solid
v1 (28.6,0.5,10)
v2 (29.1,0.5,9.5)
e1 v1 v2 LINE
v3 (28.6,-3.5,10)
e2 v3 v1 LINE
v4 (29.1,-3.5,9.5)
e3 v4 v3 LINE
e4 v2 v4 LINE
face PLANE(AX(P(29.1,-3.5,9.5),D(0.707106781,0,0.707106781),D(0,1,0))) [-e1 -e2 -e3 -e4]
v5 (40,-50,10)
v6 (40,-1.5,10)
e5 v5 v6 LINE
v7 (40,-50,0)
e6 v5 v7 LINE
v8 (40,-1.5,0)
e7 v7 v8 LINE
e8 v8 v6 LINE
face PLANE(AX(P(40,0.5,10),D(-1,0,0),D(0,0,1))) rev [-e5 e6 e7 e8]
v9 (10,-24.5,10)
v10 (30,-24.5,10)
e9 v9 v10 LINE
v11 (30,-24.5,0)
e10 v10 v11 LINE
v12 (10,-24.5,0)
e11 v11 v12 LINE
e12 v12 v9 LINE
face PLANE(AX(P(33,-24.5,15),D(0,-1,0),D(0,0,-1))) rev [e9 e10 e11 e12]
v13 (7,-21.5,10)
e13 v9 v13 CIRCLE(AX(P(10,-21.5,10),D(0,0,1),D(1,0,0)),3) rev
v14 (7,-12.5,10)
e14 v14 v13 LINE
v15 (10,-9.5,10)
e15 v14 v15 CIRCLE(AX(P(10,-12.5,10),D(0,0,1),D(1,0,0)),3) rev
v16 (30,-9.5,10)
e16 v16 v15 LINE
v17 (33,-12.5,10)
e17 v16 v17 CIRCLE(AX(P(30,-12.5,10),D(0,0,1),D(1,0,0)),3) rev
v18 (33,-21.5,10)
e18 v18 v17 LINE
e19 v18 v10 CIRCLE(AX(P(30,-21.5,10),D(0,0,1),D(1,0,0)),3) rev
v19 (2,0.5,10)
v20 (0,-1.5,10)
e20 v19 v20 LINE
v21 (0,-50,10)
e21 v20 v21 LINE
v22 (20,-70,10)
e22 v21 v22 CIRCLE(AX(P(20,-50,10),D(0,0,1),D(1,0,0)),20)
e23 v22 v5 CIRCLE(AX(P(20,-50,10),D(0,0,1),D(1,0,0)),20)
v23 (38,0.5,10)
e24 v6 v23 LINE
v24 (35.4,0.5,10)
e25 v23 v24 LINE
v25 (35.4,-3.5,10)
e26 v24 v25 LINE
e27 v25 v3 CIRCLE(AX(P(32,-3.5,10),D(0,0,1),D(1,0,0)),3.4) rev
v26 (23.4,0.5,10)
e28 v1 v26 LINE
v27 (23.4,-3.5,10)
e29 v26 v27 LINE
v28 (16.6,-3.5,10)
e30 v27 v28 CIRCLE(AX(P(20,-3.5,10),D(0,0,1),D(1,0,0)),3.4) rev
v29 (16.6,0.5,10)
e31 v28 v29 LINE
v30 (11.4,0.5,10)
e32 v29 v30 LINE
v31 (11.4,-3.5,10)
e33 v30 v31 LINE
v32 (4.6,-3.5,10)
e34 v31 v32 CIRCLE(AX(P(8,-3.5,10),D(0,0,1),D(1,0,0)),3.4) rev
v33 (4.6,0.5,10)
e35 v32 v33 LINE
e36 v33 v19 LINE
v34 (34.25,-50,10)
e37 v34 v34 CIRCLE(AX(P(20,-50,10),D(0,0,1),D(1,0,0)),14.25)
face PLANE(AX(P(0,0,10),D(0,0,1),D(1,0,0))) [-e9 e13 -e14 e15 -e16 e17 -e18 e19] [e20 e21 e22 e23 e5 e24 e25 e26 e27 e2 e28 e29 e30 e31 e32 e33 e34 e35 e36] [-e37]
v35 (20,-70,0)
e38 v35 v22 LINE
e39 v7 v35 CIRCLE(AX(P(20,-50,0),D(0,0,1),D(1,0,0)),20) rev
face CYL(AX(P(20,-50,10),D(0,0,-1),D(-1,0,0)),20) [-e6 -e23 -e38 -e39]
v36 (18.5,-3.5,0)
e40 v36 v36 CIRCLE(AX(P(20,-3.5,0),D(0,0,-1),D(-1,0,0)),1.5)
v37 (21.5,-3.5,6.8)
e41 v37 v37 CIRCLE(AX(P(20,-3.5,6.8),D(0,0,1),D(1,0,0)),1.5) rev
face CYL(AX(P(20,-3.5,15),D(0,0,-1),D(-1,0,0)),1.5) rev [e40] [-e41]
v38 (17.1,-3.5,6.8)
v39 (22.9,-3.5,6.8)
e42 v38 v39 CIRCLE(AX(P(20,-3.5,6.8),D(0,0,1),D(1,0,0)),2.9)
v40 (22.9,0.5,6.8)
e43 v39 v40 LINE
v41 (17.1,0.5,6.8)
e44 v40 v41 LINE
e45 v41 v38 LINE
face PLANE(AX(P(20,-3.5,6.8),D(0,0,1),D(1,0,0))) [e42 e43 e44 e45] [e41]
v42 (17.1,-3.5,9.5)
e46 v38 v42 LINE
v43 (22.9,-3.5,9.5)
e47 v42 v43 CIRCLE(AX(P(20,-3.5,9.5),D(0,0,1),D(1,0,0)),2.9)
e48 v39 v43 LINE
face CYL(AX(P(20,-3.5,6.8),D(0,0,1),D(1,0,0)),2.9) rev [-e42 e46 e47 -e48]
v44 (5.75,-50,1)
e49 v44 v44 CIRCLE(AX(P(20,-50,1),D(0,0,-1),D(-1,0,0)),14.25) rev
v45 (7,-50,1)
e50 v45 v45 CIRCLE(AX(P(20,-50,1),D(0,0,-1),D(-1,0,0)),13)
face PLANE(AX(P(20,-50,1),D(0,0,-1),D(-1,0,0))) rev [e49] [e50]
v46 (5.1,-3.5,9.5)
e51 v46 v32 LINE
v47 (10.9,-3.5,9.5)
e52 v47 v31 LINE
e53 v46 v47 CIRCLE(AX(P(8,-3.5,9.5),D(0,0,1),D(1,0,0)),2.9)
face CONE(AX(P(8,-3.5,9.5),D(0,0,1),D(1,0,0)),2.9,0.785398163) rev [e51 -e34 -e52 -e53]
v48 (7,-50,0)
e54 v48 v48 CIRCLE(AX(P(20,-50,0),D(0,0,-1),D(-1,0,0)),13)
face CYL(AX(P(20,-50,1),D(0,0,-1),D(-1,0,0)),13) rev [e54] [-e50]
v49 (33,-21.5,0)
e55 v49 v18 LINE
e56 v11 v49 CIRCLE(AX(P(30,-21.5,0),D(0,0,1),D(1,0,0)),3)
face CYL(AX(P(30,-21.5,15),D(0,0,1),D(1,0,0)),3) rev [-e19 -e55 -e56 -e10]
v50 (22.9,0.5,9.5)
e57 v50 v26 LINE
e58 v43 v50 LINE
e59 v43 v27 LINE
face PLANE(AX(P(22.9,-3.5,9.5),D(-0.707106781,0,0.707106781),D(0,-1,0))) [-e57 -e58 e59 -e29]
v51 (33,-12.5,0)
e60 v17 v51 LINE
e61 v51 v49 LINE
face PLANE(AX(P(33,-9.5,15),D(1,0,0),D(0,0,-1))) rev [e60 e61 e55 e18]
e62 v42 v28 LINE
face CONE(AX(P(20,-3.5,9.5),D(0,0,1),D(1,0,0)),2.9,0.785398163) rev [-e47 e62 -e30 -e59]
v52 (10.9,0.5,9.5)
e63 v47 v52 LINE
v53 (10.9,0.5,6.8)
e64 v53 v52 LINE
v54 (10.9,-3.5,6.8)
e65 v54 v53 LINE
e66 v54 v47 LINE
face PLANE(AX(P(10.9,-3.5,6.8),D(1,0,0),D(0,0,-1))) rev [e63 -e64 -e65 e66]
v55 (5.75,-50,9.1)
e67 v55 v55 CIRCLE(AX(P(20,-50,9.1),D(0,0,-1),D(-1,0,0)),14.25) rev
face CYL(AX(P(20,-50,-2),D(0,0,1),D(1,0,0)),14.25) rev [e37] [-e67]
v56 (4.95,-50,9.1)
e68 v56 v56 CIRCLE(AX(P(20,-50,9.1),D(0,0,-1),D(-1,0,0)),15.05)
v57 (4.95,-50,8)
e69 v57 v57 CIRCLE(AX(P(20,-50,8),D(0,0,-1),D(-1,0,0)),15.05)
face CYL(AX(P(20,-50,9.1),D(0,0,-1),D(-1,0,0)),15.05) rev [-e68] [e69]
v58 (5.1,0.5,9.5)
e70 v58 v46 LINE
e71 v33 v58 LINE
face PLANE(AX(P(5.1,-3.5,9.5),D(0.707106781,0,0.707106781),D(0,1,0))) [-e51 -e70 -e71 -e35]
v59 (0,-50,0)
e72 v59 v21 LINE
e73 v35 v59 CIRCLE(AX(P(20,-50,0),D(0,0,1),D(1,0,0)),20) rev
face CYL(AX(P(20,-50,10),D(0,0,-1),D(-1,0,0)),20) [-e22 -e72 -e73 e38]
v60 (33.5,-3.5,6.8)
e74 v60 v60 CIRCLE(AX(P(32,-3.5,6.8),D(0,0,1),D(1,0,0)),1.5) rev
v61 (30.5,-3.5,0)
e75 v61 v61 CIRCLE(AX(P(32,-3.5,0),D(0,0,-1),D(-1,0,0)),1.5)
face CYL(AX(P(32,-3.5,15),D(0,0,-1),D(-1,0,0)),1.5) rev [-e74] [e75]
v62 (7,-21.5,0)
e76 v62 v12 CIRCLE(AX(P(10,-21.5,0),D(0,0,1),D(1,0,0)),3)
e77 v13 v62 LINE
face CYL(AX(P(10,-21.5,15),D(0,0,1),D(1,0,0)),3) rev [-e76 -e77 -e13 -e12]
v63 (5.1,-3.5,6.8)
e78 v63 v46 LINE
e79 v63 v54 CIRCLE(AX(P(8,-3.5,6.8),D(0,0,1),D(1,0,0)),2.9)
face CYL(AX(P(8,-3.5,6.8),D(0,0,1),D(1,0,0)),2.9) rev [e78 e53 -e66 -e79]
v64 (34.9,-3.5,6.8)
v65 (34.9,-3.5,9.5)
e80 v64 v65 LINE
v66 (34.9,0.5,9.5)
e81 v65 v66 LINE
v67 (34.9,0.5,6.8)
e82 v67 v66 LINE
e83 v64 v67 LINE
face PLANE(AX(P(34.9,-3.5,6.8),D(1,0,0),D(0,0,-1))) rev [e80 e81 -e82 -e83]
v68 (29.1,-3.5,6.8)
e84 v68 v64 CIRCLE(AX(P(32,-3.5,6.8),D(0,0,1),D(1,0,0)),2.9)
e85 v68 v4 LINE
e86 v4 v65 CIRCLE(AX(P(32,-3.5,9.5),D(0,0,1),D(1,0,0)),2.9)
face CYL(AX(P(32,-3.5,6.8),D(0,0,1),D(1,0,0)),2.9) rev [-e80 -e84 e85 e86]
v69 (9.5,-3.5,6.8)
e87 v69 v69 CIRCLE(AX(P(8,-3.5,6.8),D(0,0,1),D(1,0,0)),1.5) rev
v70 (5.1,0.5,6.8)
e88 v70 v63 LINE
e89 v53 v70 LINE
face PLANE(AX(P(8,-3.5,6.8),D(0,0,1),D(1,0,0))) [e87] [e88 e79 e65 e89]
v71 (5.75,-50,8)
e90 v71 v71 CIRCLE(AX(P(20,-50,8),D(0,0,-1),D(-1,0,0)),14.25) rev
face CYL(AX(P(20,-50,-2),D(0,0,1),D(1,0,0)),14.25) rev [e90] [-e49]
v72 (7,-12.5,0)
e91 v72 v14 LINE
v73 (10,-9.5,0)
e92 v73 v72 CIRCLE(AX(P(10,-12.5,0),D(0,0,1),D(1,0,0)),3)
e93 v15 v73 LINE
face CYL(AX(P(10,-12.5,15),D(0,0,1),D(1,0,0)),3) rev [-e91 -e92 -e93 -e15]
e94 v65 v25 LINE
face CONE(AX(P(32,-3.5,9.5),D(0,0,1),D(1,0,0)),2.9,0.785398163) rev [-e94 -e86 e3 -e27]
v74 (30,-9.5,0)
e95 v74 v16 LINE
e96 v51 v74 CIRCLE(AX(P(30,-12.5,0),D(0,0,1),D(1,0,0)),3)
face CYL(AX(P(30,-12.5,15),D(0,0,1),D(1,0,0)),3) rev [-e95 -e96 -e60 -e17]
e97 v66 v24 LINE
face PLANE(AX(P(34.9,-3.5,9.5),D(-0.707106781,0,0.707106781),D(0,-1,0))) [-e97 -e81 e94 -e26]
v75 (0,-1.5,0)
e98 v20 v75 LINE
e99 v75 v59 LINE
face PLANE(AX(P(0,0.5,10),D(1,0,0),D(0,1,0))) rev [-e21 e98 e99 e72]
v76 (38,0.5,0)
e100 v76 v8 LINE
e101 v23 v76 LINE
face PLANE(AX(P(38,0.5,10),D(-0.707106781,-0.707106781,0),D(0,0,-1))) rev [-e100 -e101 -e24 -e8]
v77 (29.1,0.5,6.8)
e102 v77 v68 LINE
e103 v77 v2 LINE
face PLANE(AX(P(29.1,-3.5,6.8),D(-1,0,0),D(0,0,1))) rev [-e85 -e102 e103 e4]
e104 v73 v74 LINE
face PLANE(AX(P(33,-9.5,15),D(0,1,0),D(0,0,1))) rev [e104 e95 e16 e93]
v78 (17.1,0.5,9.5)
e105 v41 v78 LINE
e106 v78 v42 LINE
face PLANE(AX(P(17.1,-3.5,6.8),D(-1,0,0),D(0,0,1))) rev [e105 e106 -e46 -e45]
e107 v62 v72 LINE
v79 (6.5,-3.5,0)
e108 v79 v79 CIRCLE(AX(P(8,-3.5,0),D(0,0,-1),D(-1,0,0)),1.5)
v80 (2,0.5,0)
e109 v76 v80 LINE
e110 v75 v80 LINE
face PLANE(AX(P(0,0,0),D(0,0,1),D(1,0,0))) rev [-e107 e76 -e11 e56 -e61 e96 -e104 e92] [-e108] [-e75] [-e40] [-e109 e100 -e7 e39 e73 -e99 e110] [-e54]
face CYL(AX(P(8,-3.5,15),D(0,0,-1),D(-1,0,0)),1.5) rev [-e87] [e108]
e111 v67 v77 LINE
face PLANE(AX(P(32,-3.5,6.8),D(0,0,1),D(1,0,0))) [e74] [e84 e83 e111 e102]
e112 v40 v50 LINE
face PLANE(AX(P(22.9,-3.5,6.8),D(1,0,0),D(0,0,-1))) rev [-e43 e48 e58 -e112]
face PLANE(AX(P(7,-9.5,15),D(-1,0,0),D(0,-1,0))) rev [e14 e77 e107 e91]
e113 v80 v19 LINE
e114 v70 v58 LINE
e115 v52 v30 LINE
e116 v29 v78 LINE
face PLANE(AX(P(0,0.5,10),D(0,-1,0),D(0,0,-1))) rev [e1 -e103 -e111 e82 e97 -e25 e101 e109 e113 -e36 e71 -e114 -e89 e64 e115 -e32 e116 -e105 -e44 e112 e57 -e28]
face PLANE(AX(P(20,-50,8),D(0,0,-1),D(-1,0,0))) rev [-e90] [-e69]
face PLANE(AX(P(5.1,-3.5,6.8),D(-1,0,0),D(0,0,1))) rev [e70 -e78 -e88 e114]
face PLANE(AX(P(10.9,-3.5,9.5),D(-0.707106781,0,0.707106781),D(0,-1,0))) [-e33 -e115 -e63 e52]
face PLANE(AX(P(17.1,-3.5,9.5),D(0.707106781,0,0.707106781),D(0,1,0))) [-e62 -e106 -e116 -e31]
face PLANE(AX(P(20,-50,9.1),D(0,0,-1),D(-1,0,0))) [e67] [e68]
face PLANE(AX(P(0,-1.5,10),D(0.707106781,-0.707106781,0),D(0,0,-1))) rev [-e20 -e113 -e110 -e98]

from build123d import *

# Parameters (mm, degrees)
SKETCH_1_W          = 40
SKETCH_1_H          = 70.5
EXTRUDE_1_DEPTH     = 10
SKETCH_2_R          = 14.25
CUT_EXTRUDE_1_DEPTH = 12
SKETCH_3_R          = 15.05
CUT_EXTRUDE_2_DEPTH = 1.1
CHAMFER_1_SIZE      = 2
FILLET_1_R          = 20
SKETCH_4_R          = 1.5
CUT_EXTRUDE_3_DEPTH = 15
SKETCH_5_W          = 26
SKETCH_5_H          = 15
CUT_EXTRUDE_4_DEPTH = 15
FILLET_2_R          = 3
EXTRUDE_START       = -1
SKETCH_7_R          = 14.25
SKETCH_7_R_2        = 13
EXTRUDE_2_DEPTH     = 1
CUT_EXTRUDE_5_DEPTH = 3.2
CHAMFER_2_SIZE      = 0.5


with BuildPart() as part:
    # 草图1 → 凸台-拉伸1 (new body)
    with BuildSketch(Plane.XY):
        with Locations((20, -34.75)):
            Rectangle(SKETCH_1_W, SKETCH_1_H)
    extrude(amount=EXTRUDE_1_DEPTH)

    # 草图2 → 切除-拉伸1 (cut)
    with BuildSketch(Plane.XY.offset(10)):
        with Locations((20, -50)):
            Circle(SKETCH_2_R)
    extrude(amount=-CUT_EXTRUDE_1_DEPTH, mode=Mode.SUBTRACT)

    # 草图3 → 切除-拉伸2 (cut)
    with BuildSketch(Plane(origin=(0, 0, 8), x_dir=(-1, 0, 0), z_dir=(0, 0, -1))):
        with Locations((-20, -50)):
            Circle(SKETCH_3_R)
    extrude(amount=-CUT_EXTRUDE_2_DEPTH, mode=Mode.SUBTRACT)

    # 倒角1
    chamfer_1_edges = [part.edges().sort_by_distance(p)[0] for p in [
        (0, 0.5, 5),
        (40, 0.5, 5),
    ]]
    chamfer(chamfer_1_edges, length=CHAMFER_1_SIZE)

    # 圆角1
    fillet_1_edges = [part.edges().sort_by_distance(p)[0] for p in [
        (0, -70, 5),
        (40, -70, 5),
    ]]
    fillet(fillet_1_edges, radius=FILLET_1_R - 0.0001)  # a hair under: the kernel refuses the full size

    # 草图4 → 切除-拉伸3 (cut)
    with BuildSketch(Plane(origin=(0, 0, 0), x_dir=(-1, 0, 0), z_dir=(0, 0, -1))):
        with Locations((-32, -3.5)):
            Circle(SKETCH_4_R)
        with Locations((-20, -3.5)):
            Circle(SKETCH_4_R)
        with Locations((-8, -3.5)):
            Circle(SKETCH_4_R)
    extrude(amount=-CUT_EXTRUDE_3_DEPTH, mode=Mode.SUBTRACT)

    # 草图5 → 切除-拉伸4 (cut)
    with BuildSketch(Plane(origin=(0, 0, 0), x_dir=(-1, 0, 0), z_dir=(0, 0, -1))):
        with Locations((-20, -17)):
            Rectangle(SKETCH_5_W, SKETCH_5_H)
    extrude(amount=-CUT_EXTRUDE_4_DEPTH, mode=Mode.SUBTRACT)

    # 圆角2
    fillet_2_edges = [part.edges().sort_by_distance(p)[0] for p in [
        (7, -9.5, 5),
        (7, -24.5, 5),
        (33, -24.5, 5),
        (33, -9.5, 5),
    ]]
    fillet(fillet_2_edges, radius=FILLET_2_R)

    # 草图7 → 凸台-拉伸2 (add)
    with BuildSketch(Plane(origin=(0, 0, 0), x_dir=(-1, 0, 0), z_dir=(0, 0, -1)).offset(EXTRUDE_START)):
        with Locations((-20, -50)):
            Circle(SKETCH_7_R)
        with Locations((-20, -50)):
            Circle(SKETCH_7_R_2, mode=Mode.SUBTRACT)
    extrude(amount=EXTRUDE_2_DEPTH)

    # 草图8 → 切除-拉伸5 (cut)
    with BuildSketch(Plane.XY.offset(10)):
        with BuildLine():
            Line((5.1, -3.5), (5.1, 0.5))
            Line((5.1, 0.5), (10.9, 0.5))
            Line((10.9, 0.5), (10.9, -3.5))
            ThreePointArc((10.9, -3.5), (8, -6.4), (5.1, -3.5))
        make_face()
        with BuildLine():
            Line((17.1, -3.5), (17.1, 0.5))
            Line((17.1, 0.5), (22.9, 0.5))
            Line((22.9, 0.5), (22.9, -3.5))
            ThreePointArc((22.9, -3.5), (20, -6.4), (17.1, -3.5))
        make_face()
        with BuildLine():
            Line((34.9, -3.5), (34.9, 0.5))
            Line((34.9, 0.5), (29.1, 0.5))
            Line((29.1, 0.5), (29.1, -3.5))
            ThreePointArc((29.1, -3.5), (32, -6.4), (34.9, -3.5))
        make_face()
    extrude(amount=-CUT_EXTRUDE_5_DEPTH, mode=Mode.SUBTRACT)

    # 倒角2
    chamfer_2_edges = [part.edges().sort_by_distance(p)[0] for p in [
        (8, -6.4, 10),
        (10.9, -1.5, 10),
        (5.1, -1.5, 10),
        (32, -6.4, 10),
        (34.9, -1.5, 10),
        (29.1, -1.5, 10),
        (20, -6.4, 10),
        (22.9, -1.5, 10),
        (17.1, -1.5, 10),
    ]]
    chamfer(chamfer_2_edges, length=CHAMFER_2_SIZE)


solid = part.part
